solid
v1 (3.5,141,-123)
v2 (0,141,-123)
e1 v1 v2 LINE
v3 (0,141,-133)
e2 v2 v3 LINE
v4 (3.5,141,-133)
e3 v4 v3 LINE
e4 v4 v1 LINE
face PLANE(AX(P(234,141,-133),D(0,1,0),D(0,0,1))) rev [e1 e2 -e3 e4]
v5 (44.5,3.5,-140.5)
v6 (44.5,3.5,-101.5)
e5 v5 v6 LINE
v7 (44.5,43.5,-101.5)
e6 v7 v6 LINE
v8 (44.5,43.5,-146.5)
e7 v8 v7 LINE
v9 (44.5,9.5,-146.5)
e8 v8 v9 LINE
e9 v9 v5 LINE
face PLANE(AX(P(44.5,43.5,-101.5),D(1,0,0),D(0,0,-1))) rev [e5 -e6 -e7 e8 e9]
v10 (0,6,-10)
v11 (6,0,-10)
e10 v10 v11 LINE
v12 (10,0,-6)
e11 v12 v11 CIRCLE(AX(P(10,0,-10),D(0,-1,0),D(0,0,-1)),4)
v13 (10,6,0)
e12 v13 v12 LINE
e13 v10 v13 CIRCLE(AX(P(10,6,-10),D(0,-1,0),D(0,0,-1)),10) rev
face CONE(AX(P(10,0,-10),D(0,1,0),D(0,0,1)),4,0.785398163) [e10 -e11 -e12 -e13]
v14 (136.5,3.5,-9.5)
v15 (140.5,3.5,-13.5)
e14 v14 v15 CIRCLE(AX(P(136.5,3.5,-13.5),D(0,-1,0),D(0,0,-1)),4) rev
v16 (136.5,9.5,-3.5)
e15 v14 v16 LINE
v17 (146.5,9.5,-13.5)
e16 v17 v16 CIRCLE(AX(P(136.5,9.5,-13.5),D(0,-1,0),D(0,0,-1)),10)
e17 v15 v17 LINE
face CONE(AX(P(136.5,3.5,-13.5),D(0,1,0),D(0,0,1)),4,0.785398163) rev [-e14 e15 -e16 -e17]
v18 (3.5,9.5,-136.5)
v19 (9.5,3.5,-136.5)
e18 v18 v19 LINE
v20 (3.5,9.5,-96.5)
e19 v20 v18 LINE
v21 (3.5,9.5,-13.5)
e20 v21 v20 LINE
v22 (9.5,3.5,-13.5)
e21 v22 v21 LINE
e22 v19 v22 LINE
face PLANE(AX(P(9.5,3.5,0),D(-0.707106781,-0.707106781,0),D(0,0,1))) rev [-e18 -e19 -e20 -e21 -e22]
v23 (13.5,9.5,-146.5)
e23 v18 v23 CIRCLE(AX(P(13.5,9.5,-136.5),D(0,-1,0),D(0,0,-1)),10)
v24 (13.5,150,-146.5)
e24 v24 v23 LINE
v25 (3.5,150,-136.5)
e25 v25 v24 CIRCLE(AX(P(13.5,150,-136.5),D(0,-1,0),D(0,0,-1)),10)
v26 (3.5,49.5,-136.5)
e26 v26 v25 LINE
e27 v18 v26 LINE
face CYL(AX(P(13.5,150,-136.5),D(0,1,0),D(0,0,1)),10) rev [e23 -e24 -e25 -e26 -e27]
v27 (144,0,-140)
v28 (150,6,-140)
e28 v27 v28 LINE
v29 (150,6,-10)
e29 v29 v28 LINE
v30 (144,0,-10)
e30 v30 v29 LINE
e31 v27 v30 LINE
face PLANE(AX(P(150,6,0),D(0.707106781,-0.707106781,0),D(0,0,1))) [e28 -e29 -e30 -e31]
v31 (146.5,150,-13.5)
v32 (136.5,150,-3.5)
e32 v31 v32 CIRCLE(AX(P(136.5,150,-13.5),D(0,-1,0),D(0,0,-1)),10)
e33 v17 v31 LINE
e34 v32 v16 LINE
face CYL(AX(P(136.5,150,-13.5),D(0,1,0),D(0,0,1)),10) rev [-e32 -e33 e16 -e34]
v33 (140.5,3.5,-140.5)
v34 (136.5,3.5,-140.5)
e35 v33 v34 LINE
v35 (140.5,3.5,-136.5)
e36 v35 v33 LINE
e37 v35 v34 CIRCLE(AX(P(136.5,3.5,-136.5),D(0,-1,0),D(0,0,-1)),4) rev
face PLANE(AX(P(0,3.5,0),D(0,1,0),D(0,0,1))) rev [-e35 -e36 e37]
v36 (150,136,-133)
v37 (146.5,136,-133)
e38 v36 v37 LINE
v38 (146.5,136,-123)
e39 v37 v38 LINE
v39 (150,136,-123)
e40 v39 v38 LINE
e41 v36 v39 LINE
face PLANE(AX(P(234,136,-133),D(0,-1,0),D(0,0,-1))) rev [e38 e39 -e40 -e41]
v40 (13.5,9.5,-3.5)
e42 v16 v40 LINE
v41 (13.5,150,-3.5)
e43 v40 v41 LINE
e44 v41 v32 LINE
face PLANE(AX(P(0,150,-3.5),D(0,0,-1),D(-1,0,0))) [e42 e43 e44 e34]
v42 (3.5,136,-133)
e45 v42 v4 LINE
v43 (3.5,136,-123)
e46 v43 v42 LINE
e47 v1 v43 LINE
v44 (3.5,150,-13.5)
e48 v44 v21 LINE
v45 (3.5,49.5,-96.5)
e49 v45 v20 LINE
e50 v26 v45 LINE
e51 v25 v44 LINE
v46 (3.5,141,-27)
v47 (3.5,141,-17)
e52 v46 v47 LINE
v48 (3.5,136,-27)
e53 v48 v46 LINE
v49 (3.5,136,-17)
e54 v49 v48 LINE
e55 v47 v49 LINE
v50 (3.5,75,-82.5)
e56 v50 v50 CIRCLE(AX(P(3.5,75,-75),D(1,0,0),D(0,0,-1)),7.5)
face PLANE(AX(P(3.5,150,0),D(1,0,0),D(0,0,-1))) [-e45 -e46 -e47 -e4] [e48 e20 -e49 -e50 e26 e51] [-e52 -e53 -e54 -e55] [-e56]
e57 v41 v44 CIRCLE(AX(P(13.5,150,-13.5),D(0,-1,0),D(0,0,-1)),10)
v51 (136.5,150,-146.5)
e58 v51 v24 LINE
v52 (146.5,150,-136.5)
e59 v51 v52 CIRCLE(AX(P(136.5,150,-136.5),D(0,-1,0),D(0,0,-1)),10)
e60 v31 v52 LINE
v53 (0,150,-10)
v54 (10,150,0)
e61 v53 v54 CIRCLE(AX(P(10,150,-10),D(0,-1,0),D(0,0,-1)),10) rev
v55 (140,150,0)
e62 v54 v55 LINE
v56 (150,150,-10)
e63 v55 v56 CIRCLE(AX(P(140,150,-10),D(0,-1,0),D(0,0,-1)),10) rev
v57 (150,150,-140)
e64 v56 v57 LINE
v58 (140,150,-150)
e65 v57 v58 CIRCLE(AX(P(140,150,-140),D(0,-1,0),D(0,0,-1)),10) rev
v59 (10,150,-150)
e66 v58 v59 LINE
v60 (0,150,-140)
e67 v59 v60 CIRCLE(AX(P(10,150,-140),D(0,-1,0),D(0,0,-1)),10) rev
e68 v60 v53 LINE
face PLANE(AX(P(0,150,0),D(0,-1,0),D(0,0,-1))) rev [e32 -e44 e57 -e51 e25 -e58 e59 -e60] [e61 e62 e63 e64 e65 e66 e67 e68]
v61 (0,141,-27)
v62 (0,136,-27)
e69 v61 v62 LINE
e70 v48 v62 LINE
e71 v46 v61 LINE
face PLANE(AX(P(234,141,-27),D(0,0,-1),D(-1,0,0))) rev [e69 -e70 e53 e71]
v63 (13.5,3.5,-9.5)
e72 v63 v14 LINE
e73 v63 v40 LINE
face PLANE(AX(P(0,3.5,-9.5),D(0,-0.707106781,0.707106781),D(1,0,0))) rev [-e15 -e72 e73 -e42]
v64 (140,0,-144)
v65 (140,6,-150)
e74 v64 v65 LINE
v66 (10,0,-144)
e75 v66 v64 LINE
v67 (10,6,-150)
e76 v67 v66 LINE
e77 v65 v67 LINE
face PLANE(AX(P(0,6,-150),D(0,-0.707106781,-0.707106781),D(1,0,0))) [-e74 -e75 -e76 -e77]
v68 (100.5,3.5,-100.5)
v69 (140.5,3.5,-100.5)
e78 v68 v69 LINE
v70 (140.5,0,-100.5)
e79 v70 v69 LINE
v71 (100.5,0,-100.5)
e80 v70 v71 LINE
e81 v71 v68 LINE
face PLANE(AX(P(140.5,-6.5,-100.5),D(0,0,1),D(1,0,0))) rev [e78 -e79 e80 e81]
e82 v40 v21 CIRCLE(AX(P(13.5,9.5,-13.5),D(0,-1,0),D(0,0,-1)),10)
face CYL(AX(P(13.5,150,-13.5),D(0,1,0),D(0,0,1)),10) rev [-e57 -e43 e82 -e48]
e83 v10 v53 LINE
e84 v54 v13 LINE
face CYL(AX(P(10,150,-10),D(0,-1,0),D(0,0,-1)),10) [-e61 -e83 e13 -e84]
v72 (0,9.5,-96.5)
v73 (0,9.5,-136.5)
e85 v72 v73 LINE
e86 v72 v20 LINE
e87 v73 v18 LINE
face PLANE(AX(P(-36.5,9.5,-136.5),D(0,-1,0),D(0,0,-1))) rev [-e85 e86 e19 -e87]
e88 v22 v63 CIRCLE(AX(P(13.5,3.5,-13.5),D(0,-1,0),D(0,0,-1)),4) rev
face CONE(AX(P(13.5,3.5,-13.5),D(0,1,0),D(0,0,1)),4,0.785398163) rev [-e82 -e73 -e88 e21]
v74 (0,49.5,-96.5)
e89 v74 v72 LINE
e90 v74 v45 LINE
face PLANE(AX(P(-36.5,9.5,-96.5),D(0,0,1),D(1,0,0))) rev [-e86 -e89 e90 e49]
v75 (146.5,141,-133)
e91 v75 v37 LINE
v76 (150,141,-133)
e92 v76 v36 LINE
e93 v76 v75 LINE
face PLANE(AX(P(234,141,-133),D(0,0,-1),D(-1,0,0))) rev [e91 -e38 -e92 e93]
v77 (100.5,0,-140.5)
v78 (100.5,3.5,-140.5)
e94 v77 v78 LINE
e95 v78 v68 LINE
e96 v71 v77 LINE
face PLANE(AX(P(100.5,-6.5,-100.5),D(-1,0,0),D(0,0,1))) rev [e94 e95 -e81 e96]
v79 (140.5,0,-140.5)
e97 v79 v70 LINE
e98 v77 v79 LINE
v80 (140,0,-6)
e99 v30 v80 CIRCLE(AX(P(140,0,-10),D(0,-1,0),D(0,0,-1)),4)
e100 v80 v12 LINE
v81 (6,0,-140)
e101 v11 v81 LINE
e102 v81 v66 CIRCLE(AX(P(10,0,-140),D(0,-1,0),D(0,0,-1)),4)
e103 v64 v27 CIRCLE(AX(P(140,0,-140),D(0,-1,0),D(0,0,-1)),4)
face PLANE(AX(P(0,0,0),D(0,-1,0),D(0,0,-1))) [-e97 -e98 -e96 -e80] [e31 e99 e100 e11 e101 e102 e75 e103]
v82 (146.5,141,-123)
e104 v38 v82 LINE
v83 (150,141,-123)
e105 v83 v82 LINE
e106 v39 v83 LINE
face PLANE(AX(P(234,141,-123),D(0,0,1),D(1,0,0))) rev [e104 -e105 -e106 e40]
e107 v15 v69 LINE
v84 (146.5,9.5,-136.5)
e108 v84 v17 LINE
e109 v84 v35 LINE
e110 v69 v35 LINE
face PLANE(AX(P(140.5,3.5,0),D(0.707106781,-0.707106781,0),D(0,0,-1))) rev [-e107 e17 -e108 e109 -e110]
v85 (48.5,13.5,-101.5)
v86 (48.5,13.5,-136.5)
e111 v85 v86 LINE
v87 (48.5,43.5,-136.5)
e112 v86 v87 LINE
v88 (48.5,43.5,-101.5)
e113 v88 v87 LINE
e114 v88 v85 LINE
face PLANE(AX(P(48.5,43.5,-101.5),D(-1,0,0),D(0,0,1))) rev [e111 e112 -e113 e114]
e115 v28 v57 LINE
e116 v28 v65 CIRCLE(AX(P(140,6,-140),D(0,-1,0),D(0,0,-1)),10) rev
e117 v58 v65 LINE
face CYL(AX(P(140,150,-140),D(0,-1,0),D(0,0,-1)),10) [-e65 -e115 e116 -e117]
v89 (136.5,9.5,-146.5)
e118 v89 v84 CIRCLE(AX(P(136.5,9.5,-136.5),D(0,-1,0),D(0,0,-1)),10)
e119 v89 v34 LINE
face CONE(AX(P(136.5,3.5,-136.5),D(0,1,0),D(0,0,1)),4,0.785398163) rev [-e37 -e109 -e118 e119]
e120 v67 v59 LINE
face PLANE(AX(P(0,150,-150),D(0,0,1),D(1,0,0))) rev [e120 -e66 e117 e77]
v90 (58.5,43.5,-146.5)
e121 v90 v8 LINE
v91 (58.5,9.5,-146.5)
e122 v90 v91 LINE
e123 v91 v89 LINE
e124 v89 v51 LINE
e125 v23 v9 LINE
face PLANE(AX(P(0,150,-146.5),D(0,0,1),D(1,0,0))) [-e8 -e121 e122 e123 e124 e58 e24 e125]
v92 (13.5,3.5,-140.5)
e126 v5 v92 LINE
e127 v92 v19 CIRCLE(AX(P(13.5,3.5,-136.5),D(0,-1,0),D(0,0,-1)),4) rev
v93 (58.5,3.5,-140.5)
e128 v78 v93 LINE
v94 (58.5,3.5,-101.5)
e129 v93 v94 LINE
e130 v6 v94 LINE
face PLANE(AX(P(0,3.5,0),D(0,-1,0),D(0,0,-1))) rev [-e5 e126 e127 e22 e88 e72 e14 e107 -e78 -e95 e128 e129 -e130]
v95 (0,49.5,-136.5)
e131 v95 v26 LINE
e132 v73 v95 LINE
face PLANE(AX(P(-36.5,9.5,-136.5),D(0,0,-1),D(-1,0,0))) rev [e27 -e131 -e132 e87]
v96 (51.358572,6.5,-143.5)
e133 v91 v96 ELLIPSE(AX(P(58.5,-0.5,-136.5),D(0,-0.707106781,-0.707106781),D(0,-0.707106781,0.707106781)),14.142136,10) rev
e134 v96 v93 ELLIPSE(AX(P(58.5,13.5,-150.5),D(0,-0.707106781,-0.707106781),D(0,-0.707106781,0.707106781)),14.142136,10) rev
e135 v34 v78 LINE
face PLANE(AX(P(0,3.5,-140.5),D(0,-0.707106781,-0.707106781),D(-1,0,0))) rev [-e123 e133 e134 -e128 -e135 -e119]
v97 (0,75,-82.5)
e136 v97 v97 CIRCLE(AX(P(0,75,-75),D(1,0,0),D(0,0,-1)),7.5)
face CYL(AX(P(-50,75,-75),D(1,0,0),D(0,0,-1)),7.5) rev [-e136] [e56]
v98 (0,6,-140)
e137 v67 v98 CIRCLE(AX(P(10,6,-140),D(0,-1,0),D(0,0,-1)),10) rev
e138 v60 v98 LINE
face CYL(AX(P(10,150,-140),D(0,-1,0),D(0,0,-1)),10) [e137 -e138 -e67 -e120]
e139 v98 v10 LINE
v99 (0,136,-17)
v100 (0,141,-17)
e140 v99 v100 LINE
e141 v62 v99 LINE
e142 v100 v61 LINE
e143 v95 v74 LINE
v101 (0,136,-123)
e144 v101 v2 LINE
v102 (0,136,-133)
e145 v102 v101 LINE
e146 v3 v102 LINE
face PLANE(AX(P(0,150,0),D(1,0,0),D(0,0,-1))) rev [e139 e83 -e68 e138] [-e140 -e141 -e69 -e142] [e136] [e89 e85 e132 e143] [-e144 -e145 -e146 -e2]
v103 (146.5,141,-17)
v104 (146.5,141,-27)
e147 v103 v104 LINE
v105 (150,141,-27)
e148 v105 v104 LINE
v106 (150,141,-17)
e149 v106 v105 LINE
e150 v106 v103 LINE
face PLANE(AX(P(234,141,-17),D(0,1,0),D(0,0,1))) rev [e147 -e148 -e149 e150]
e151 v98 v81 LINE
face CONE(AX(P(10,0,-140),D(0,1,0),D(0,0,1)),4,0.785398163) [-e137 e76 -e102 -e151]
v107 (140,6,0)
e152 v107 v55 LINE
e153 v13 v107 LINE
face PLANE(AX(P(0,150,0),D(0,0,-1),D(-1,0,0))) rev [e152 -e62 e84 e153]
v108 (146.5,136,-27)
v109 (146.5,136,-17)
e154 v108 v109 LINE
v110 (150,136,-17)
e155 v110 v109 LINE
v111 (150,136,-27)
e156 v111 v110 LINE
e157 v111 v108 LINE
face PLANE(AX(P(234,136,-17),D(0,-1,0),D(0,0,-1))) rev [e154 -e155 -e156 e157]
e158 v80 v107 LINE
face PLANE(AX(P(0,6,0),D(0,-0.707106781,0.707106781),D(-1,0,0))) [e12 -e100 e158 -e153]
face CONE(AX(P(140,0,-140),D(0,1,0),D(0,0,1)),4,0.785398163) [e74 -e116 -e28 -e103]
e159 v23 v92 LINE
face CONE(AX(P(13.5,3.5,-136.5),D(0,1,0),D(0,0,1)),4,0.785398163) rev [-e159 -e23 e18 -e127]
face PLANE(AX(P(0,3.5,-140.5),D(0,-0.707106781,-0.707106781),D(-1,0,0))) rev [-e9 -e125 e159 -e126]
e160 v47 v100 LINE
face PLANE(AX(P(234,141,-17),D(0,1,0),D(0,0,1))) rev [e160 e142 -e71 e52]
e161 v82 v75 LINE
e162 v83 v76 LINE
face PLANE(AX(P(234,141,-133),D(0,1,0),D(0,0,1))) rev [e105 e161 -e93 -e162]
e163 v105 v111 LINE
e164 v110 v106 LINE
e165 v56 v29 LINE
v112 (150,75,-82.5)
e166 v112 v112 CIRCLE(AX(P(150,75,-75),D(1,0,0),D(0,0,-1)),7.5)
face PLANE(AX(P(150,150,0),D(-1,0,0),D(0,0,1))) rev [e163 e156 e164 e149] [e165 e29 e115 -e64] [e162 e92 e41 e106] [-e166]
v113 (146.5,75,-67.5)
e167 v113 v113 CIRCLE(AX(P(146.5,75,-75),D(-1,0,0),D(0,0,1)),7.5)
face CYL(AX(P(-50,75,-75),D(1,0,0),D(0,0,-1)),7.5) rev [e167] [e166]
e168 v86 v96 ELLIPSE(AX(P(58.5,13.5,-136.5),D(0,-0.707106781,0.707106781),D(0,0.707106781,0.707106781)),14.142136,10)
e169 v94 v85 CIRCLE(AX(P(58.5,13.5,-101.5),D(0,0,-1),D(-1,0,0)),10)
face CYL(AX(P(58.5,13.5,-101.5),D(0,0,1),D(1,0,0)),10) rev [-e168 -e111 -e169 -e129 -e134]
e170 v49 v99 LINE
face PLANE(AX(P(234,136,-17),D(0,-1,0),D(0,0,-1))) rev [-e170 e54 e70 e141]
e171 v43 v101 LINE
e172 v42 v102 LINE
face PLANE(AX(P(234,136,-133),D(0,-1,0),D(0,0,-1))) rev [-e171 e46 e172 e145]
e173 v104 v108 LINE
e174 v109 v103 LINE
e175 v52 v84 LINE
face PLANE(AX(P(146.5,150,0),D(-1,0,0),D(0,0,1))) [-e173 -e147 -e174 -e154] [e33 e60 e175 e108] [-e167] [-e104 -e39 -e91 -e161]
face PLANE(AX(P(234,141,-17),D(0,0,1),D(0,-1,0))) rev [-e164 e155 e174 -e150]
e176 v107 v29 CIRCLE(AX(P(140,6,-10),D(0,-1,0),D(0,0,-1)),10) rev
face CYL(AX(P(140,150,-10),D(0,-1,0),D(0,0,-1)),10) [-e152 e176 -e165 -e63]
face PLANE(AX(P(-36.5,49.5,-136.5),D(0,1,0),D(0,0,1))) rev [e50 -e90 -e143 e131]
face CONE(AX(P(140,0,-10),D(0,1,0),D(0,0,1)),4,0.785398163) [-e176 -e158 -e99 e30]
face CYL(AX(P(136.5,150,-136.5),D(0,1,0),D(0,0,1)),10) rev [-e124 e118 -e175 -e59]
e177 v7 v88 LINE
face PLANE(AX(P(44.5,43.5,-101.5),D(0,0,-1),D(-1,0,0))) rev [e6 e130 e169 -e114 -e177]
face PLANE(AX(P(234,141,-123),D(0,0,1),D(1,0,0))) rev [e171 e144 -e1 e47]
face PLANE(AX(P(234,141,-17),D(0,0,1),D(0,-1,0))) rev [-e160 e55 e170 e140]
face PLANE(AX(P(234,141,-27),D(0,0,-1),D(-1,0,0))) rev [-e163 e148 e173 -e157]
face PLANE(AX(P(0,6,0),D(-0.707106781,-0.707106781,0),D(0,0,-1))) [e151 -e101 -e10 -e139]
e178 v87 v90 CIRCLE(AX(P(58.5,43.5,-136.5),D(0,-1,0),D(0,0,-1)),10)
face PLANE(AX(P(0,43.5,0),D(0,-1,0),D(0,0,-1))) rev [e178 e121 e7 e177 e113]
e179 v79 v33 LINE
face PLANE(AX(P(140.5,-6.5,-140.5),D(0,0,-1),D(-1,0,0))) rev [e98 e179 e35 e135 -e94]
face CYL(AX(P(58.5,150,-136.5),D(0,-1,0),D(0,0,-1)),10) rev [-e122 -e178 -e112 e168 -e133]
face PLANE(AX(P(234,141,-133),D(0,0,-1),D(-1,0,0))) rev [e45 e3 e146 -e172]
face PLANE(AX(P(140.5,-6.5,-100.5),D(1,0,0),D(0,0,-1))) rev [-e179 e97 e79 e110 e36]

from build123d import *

# Parameters (mm, degrees)
SKETCH1_W           = 150
SKETCH1_H           = 150
BOSS_EXTRUDE1_DEPTH = 150
SHELL1_T            = -3.5
FILLET2_R           = 10
FILLET3_R           = 10
SKETCH2_R           = 7.5
CUT_EXTRUDE1_DEPTH  = 200
CHAMFER1_SIZE       = 6
CHAMFER2_SIZE       = 6
SKETCH3_W           = 10
SKETCH3_H           = 5
CUT_EXTRUDE2_DEPTH  = 234
SKETCH4_W           = 10
SKETCH4_H           = 5
CUT_EXTRUDE3_DEPTH  = 234
SKETCH5_W           = 40
SKETCH5_H           = 40
CUT_EXTRUDE4_DEPTH  = 10
SKETCH6_W           = 4
SKETCH6_H           = 45
BOSS_EXTRUDE2_DEPTH = 40
FILLET4_R           = 10
SKETCH7_W           = 40
SKETCH7_H           = 40
CUT_EXTRUDE5_DEPTH  = 40


with BuildPart() as part:
    # Sketch1 → Boss-Extrude1 (new body)
    with BuildSketch(Plane(origin=(0, 0, 0), x_dir=(1, 0, 0), z_dir=(0, 1, 0))):
        with Locations((75, 75)):
            Rectangle(SKETCH1_W, SKETCH1_H)
    extrude(amount=BOSS_EXTRUDE1_DEPTH)

    # Shell1
    shell1_openings = [part.faces().sort_by_distance(p)[0] for p in [
        (75, 150, -75),
    ]]
    offset(amount=SHELL1_T, openings=shell1_openings, kind=Kind.INTERSECTION)

    # Fillet2
    fillet2_edges = [part.edges().sort_by_distance(p)[0] for p in [
        (150, 75, -150),
        (150, 75, 0),
        (0, 75, 0),
    ]]
    fillet(fillet2_edges, radius=FILLET2_R)

    # Fillet3
    fillet3_edges = [part.edges().sort_by_distance(p)[0] for p in [
        (3.5, 76.75, -146.5),
        (3.5, 76.75, -3.5),
        (146.5, 76.75, -3.5),
        (146.5, 76.75, -146.5),
        (0, 75, -150),
    ]]
    fillet(fillet3_edges, radius=FILLET3_R)

    # Sketch2 → Cut-Extrude1 (cut)
    with BuildSketch(Plane(origin=(150, 0, 0), x_dir=(0, 0, -1), z_dir=(1, 0, 0))):
        with Locations((75, 75)):
            Circle(SKETCH2_R)
    extrude(amount=-CUT_EXTRUDE1_DEPTH, mode=Mode.SUBTRACT)

    # Chamfer1
    chamfer1_edges = [part.edges().sort_by_distance(p)[0] for p in [
        (75, 0, -150),
        (150, 0, -75),
        (75, 0, 0),
        (2.928932188, 0, -2.928932188),
        (147.071067812, 0, -2.928932188),
        (147.071067812, 0, -147.071067812),
        (0, 0, -75),
        (2.928932188, 0, -147.071067812),
    ]]
    chamfer(chamfer1_edges, length=CHAMFER1_SIZE)

    # Chamfer2
    chamfer2_edges = [part.edges().sort_by_distance(p)[0] for p in [
        (3.5, 3.5, -75),
        (75, 3.5, -3.5),
        (146.5, 3.5, -75),
        (75, 3.5, -146.5),
        (6.428932188, 3.5, -143.571067812),
        (143.571067812, 3.5, -143.571067812),
        (143.571067812, 3.5, -6.428932188),
        (6.428932188, 3.5, -6.428932188),
    ]]
    chamfer(chamfer2_edges, length=CHAMFER2_SIZE)

    # Sketch3 → Cut-Extrude2 (cut)
    with BuildSketch(Plane.ZY):
        with Locations((-128, 138.5)):
            Rectangle(SKETCH3_W, SKETCH3_H)
    extrude(amount=-CUT_EXTRUDE2_DEPTH, mode=Mode.SUBTRACT)

    # Sketch4 → Cut-Extrude3 (cut)
    with BuildSketch(Plane.ZY):
        with Locations((-22, 138.5)):
            Rectangle(SKETCH4_W, SKETCH4_H)
    extrude(amount=-CUT_EXTRUDE3_DEPTH, mode=Mode.SUBTRACT)

    # Sketch5 → Cut-Extrude4 (cut)
    with BuildSketch(Plane(origin=(0, 3.5, 0), x_dir=(1, 0, 0), z_dir=(0, 1, 0))):
        with Locations((120.5, 120.5)):
            Rectangle(SKETCH5_W, SKETCH5_H)
    extrude(amount=-CUT_EXTRUDE4_DEPTH, mode=Mode.SUBTRACT)

    # Sketch6 → Boss-Extrude2 (add)
    with BuildSketch(Plane(origin=(0, 3.5, 0), x_dir=(1, 0, 0), z_dir=(0, 1, 0))):
        with Locations((46.5, 124)):
            Rectangle(SKETCH6_W, SKETCH6_H)
    extrude(amount=BOSS_EXTRUDE2_DEPTH)

    # Fillet4
    # the kernel refuses this fillet: 10 mm, written as the material it adds along each edge
    with BuildSketch(Plane(origin=(48.5, -15.5, -146.5), x_dir=(1, 0, 0), z_dir=(0, 1, 0))) as fillet4_piece_1_section:
        with BuildLine():
            CenterArc((FILLET4_R, -FILLET4_R), FILLET4_R, 90, 90)
            Line((0, -FILLET4_R), (0, 0))
            Line((0, 0), (FILLET4_R, 0))
        make_face()
    fillet4_piece_1 = extrude(amount=59, mode=Mode.PRIVATE)
    fillet4_piece_1 = split(fillet4_piece_1, bisect_by=Plane(origin=(50.679406429, 12.771443898, -156.771443898), z_dir=(0, 0.7071067811865476, 0.7071067811865476)), keep=Keep.TOP, mode=Mode.PRIVATE)
    fillet4_piece_1 = split(fillet4_piece_1, bisect_by=Plane(origin=(50.679406429, 0, -144.176636194), z_dir=(0, 1, 0)), keep=Keep.TOP, mode=Mode.PRIVATE)
    add(fillet4_piece_1)
    with BuildSketch(Plane(origin=(48.5, 3.5, -101.5), x_dir=(1, 0, 0), z_dir=(0, 0, -1))) as fillet4_piece_2_section:
        with BuildLine():
            CenterArc((FILLET4_R, -FILLET4_R), FILLET4_R, 90, 90)
            Line((0, -FILLET4_R), (0, 0))
            Line((0, 0), (FILLET4_R, 0))
        make_face()
    fillet4_piece_2 = extrude(amount=64, mode=Mode.PRIVATE)
    fillet4_piece_2 = split(fillet4_piece_2, bisect_by=Plane(origin=(50.685995649, 5.81247532, -146.5), z_dir=(0, 0, 1)), keep=Keep.TOP, mode=Mode.PRIVATE)
    add(fillet4_piece_2)

    # Sketch7 → Cut-Extrude5 (cut)
    with BuildSketch(Plane(origin=(3.5, 0, 0), x_dir=(0, 0, -1), z_dir=(1, 0, 0))):
        with Locations((116.5, 29.5)):
            Rectangle(SKETCH7_W, SKETCH7_H)
    extrude(amount=-CUT_EXTRUDE5_DEPTH, mode=Mode.SUBTRACT)


solid = part.part
